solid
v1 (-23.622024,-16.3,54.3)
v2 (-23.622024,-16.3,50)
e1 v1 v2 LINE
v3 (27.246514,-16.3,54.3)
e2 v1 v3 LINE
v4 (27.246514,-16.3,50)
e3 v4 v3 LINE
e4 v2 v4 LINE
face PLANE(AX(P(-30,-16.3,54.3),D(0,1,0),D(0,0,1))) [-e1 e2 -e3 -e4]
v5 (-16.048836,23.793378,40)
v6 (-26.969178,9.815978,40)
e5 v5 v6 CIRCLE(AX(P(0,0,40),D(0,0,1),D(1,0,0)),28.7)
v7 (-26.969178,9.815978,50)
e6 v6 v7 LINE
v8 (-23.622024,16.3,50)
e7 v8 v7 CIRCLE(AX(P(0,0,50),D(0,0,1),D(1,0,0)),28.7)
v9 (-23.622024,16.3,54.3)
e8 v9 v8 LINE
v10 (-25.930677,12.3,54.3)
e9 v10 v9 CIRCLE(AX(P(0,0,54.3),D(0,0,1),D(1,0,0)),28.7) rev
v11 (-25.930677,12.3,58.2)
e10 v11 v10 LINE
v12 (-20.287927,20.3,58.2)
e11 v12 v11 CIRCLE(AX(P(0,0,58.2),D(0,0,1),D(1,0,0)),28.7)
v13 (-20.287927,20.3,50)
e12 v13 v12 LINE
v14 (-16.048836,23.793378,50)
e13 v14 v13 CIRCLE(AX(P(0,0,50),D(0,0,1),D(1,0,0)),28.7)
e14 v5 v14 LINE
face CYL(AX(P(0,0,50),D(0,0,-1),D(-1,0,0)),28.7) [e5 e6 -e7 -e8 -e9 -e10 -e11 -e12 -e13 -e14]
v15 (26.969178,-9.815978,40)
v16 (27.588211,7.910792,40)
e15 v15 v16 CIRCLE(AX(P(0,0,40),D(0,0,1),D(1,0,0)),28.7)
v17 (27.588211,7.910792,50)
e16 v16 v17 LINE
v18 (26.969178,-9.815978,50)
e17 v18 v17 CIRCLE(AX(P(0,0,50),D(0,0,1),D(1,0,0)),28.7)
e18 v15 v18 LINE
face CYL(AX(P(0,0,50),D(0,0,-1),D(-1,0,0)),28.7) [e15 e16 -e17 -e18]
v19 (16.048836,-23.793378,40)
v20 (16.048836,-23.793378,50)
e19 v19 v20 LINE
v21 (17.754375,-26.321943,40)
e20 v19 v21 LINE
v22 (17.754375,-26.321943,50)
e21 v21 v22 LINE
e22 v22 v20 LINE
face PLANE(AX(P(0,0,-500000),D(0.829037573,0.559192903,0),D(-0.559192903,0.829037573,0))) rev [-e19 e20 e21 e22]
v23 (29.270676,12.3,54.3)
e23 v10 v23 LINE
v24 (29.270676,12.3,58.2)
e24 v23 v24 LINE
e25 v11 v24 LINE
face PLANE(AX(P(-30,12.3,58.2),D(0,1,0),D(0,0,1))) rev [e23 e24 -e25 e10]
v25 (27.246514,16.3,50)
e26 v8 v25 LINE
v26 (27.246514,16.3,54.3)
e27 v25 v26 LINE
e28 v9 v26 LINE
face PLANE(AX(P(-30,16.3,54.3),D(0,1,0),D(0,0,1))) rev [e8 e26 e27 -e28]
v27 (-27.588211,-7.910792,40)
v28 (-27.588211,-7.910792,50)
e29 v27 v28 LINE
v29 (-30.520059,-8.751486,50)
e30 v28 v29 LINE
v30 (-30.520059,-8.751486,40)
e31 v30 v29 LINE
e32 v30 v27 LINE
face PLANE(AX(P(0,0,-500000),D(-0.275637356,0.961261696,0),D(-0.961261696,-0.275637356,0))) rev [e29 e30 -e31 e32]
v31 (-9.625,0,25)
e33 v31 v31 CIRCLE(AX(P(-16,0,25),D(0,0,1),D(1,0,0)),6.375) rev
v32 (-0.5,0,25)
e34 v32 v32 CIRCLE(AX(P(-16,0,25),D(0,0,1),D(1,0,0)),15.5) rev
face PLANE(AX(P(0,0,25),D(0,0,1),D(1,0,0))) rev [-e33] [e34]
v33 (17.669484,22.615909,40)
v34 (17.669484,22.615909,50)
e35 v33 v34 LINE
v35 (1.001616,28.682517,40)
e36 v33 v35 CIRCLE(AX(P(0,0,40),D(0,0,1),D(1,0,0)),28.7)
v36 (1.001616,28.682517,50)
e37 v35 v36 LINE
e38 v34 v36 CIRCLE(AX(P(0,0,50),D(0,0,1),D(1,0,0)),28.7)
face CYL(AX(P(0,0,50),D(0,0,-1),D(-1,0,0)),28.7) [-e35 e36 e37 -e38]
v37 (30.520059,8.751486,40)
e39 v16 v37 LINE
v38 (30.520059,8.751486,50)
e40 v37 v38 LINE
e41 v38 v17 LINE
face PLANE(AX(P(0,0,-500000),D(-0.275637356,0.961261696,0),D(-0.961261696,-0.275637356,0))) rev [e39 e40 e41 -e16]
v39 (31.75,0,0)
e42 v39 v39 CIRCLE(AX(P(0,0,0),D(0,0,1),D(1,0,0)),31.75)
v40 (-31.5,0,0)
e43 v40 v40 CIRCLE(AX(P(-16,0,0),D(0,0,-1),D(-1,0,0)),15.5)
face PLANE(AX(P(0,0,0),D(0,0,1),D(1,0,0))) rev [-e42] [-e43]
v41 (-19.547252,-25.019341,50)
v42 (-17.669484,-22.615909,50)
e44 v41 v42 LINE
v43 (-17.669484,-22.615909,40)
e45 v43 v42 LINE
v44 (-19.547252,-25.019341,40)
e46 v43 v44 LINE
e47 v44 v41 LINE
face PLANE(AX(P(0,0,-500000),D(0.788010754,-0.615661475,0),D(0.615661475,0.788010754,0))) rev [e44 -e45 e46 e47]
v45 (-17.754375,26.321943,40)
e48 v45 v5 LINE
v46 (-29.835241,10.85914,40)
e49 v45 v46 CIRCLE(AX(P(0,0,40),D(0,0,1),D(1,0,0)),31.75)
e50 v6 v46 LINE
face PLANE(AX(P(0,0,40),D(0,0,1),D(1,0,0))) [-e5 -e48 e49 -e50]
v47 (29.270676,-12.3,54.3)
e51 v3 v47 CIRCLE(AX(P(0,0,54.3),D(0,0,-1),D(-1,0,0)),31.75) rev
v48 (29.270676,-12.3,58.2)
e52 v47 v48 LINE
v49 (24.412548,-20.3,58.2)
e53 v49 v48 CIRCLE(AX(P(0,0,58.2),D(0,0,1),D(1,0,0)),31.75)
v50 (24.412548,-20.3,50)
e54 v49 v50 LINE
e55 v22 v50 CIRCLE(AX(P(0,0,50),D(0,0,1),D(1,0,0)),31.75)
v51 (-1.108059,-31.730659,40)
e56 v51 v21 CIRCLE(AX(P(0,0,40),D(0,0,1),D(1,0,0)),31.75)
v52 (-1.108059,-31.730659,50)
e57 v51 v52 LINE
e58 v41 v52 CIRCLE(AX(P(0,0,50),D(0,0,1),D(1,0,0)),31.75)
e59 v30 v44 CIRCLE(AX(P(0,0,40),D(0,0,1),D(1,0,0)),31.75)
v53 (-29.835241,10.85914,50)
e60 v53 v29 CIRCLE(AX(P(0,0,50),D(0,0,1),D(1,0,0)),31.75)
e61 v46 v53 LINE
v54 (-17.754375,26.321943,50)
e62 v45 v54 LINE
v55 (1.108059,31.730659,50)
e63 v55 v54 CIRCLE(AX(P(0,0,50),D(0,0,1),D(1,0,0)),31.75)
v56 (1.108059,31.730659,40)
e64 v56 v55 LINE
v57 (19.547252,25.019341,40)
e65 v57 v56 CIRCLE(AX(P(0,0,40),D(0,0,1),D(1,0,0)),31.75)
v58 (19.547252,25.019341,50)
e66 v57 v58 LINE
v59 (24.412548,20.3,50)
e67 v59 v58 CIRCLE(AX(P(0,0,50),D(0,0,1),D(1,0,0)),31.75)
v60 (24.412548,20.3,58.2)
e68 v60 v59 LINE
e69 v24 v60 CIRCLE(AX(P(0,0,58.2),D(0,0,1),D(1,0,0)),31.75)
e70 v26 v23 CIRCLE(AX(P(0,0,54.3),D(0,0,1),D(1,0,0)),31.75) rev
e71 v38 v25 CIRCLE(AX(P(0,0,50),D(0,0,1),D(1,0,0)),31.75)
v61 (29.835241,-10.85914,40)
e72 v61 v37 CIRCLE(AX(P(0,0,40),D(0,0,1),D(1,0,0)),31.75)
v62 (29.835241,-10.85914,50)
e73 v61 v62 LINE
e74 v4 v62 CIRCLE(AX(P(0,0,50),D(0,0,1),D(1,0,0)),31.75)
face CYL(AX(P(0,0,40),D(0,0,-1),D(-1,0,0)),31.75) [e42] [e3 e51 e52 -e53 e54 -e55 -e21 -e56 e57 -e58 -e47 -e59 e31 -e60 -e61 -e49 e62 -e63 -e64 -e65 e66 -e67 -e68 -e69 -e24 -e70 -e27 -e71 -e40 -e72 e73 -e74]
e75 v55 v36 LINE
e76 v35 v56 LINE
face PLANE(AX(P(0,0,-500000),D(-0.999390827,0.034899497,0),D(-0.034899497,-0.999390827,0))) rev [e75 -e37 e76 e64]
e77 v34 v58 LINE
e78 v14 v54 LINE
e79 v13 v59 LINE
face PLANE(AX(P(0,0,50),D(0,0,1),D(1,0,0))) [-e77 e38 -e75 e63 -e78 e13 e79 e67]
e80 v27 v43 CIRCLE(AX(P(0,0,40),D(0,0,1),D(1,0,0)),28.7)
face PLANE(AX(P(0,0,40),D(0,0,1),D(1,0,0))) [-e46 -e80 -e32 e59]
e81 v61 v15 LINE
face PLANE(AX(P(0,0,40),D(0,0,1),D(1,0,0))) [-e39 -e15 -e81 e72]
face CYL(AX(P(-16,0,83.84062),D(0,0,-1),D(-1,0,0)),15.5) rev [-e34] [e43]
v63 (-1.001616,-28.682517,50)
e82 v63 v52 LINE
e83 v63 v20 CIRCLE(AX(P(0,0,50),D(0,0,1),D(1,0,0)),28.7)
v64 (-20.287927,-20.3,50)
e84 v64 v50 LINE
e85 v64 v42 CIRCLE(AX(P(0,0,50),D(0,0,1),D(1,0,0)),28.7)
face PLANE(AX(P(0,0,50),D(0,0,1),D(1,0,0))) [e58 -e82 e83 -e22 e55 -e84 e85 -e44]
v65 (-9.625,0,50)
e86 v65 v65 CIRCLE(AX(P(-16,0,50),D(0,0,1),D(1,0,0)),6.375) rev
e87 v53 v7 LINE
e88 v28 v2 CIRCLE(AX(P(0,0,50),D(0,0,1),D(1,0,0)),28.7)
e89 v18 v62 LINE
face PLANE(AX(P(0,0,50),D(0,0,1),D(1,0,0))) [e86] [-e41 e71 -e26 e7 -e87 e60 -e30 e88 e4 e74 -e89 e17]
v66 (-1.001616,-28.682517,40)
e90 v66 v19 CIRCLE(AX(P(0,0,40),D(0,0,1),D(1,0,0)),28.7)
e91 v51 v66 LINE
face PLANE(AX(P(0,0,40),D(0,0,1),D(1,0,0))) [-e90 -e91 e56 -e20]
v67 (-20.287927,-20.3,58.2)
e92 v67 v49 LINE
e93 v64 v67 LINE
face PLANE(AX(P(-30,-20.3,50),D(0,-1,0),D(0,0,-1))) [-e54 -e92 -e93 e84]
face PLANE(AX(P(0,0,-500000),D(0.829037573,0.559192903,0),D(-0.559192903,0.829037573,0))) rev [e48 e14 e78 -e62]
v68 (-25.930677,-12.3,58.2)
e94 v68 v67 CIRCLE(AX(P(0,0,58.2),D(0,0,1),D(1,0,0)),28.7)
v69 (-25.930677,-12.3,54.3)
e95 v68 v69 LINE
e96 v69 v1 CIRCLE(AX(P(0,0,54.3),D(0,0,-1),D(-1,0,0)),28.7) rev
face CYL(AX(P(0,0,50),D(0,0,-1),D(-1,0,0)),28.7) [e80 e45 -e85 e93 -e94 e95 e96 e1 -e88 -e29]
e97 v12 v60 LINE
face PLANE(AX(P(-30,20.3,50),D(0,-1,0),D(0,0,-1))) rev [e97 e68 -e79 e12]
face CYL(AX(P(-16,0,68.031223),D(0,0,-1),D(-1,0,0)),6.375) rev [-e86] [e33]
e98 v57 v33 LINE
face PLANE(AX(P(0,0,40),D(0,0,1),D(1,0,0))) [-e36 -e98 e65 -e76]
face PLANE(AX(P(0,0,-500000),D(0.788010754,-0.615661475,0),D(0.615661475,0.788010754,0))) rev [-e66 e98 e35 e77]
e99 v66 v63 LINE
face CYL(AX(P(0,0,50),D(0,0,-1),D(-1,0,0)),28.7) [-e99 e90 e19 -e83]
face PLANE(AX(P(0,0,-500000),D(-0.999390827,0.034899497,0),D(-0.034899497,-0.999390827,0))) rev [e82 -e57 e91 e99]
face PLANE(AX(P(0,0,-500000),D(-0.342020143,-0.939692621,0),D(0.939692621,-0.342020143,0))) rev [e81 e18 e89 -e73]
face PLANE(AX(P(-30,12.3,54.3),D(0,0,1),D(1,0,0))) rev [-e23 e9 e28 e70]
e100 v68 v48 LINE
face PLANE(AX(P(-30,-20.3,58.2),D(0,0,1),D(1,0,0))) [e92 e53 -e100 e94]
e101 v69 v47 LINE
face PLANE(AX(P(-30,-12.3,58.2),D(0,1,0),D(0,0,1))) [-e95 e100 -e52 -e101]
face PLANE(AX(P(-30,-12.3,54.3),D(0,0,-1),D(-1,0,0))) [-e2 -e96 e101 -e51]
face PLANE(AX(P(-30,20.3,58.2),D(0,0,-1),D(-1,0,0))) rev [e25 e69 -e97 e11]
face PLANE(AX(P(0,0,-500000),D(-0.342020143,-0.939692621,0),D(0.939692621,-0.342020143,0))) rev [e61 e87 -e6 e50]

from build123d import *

# Parameters (mm, degrees)
SKETCH1_R           = 28.7
BOSS_EXTRUDE1_DEPTH = 50
SKETCH1_3_R         = 31.75
SKETCH1_3_R_2       = 28.7
BOSS_EXTRUDE2_DEPTH = 40
SKETCH3_R           = 6.375
CUT_EXTRUDE1_DEPTH  = 50
SKETCH3_3_R         = 15.5
SKETCH3_3_R_2       = 6.375
CUT_EXTRUDE2_DEPTH  = 25
BOSS_EXTRUDE3_START = -10
BOSS_EXTRUDE3_DEPTH = 10
BOSS_EXTRUDE4_DEPTH = 30
SKETCH7_OUTSIDE_W   = 86.902
SKETCH7_OUTSIDE_H   = 86.902
CUT_EXTRUDE3_DEPTH  = 68.202120502


# Read off the part's stored shape, not the designer's step: Boss-Extrude3
with BuildPart() as part:
    # Sketch1 → Boss-Extrude1 (new body)
    with BuildSketch(Plane.XY):
        Circle(SKETCH1_R)
    extrude(amount=BOSS_EXTRUDE1_DEPTH)

    # Sketch1<3> → Boss-Extrude2 (add)
    with BuildSketch(Plane.XY):
        Circle(SKETCH1_3_R)
        Circle(SKETCH1_3_R_2, mode=Mode.SUBTRACT)
    extrude(amount=BOSS_EXTRUDE2_DEPTH)

    # Sketch3 → Cut-Extrude1 (cut)
    with BuildSketch(Plane(origin=(0, 0, 0), x_dir=(-1, 0, 0), z_dir=(0, 0, -1))):
        with Locations((16, 0)):
            Circle(SKETCH3_R)
    extrude(amount=-CUT_EXTRUDE1_DEPTH, mode=Mode.SUBTRACT)

    # Sketch3<3> → Cut-Extrude2 (cut)
    with BuildSketch(Plane(origin=(0, 0, 0), x_dir=(-1, 0, 0), z_dir=(0, 0, -1))):
        with Locations((16, 0)):
            Circle(SKETCH3_3_R)
        with Locations(Location((16, 0, 0), (0, 0, 180))):
            Circle(SKETCH3_3_R_2, mode=Mode.SUBTRACT)
    extrude(amount=-CUT_EXTRUDE2_DEPTH, mode=Mode.SUBTRACT)

    # Boss-Extrude3 outline → Boss-Extrude3 (add)
    with BuildSketch(Plane.XY.offset(50).offset(BOSS_EXTRUDE3_START)):
        with BuildLine():
            Line((-30.520058846, -8.751486047), (-27.588210673, -7.910792112))
            ThreePointArc((-27.588210673, -7.910792112), (-28.682516735, 1.001615555), (-26.969178217, 9.815978113))
            Line((-26.969178217, 9.815978113), (-29.83524071, 10.859139551))
            ThreePointArc((-29.83524071, 10.859139551), (-31.730658758, 1.108059021), (-30.520058846, -8.751486047))
        make_face()
        with BuildLine():
            ThreePointArc((-1.001615555, -28.682516735), (-9.815978113, -26.969178217), (-17.669484342, -22.615908629))
            Line((-17.669484342, -22.615908629), (-19.547251842, -25.019341427))
            ThreePointArc((-19.547251842, -25.019341427), (-10.859139551, -29.83524071), (-1.10805902, -31.730658758))
            Line((-1.10805902, -31.730658758), (-1.001615555, -28.682516735))
        make_face()
        with BuildLine():
            Line((-17.754374685, 26.321942929), (-16.04883633, 23.793378332))
            ThreePointArc((-16.04883633, 23.793378332), (-7.910792112, 27.588210673), (1.001615555, 28.682516735))
            Line((1.001615555, 28.682516735), (1.10805902, 31.730658758))
            ThreePointArc((1.10805902, 31.730658758), (-8.751486047, 30.520058846), (-17.754374685, 26.321942929))
        make_face()
        with BuildLine():
            ThreePointArc((26.969178217, -9.815978113), (22.615908629, -17.669484341), (16.04883633, -23.793378332))
            Line((16.04883633, -23.793378332), (17.754374685, -26.321942929))
            ThreePointArc((17.754374685, -26.321942929), (25.019341427, -19.547251842), (29.83524071, -10.859139551))
            Line((29.83524071, -10.859139551), (26.969178217, -9.815978113))
        make_face()
        with BuildLine():
            Line((19.547251842, 25.019341427), (17.669484342, 22.615908629))
            ThreePointArc((17.669484342, 22.615908629), (23.793378332, 16.04883633), (27.588210673, 7.910792112))
            Line((27.588210673, 7.910792112), (30.520058846, 8.751486047))
            ThreePointArc((30.520058846, 8.751486047), (26.321942929, 17.754374685), (19.547251842, 25.019341427))
        make_face()
    extrude(amount=BOSS_EXTRUDE3_DEPTH)

    # Sketch5 → Boss-Extrude4 (add, symmetric)
    with BuildSketch(Plane(origin=(0, 0, 0), x_dir=(0, 0, -1), z_dir=(1, 0, 0))):
        Polygon((-58.2, -12.3), (-54.3, -12.3), (-54.3, -16.3), (-50, -16.3), (-50, -20.3), (-58.2, -20.3), align=None)
    boss_extrude4 = extrude(amount=BOSS_EXTRUDE4_DEPTH, both=True)

    # Mirror1: Boss-Extrude4 across plane
    add(boss_extrude4.mirror(Plane.ZX))

    # Sketch7 outside → Cut-Extrude3 (cut, through all)
    with BuildSketch(Plane.XY.offset(50)):
        Rectangle(SKETCH7_OUTSIDE_W, SKETCH7_OUTSIDE_H)
        with BuildLine():
            Line((-17.669484342, -22.615908629), (-19.547251842, -25.019341427))
            ThreePointArc((-19.547251842, -25.019341427), (-10.859139551, -29.83524071), (-1.10805902, -31.730658758))
            Line((-1.10805902, -31.730658758), (-1.001615555, -28.682516735))
            ThreePointArc((-1.001615555, -28.682516735), (7.910792112, -27.588210673), (16.04883633, -23.793378332))
            Line((16.04883633, -23.793378332), (17.754374685, -26.321942929))
            ThreePointArc((17.754374685, -26.321942929), (25.019341427, -19.547251842), (29.83524071, -10.859139551))
            Line((29.83524071, -10.859139551), (26.969178217, -9.815978113))
            ThreePointArc((26.969178217, -9.815978113), (28.682516735, -1.001615555), (27.588210673, 7.910792112))
            Line((27.588210673, 7.910792112), (30.520058846, 8.751486047))
            ThreePointArc((30.520058846, 8.751486047), (26.321942929, 17.754374685), (19.547251842, 25.019341427))
            Line((19.547251842, 25.019341427), (17.669484342, 22.615908629))
            ThreePointArc((17.669484342, 22.615908629), (9.815978113, 26.969178217), (1.001615555, 28.682516735))
            Line((1.001615555, 28.682516735), (1.10805902, 31.730658758))
            ThreePointArc((1.10805902, 31.730658758), (-8.751486047, 30.520058846), (-17.754374685, 26.321942929))
            Line((-17.754374685, 26.321942929), (-16.04883633, 23.793378332))
            ThreePointArc((-16.04883633, 23.793378332), (-22.615908629, 17.669484342), (-26.969178217, 9.815978113))
            Line((-26.969178217, 9.815978113), (-29.83524071, 10.859139551))
            ThreePointArc((-29.83524071, 10.859139551), (-31.730658758, 1.10805902), (-30.520058846, -8.751486047))
            Line((-30.520058846, -8.751486047), (-27.588210673, -7.910792112))
            ThreePointArc((-27.588210673, -7.910792112), (-23.793378332, -16.04883633), (-17.669484342, -22.615908629))
        make_face(mode=Mode.SUBTRACT)
    extrude(amount=CUT_EXTRUDE3_DEPTH, mode=Mode.SUBTRACT)


solid = part.part
